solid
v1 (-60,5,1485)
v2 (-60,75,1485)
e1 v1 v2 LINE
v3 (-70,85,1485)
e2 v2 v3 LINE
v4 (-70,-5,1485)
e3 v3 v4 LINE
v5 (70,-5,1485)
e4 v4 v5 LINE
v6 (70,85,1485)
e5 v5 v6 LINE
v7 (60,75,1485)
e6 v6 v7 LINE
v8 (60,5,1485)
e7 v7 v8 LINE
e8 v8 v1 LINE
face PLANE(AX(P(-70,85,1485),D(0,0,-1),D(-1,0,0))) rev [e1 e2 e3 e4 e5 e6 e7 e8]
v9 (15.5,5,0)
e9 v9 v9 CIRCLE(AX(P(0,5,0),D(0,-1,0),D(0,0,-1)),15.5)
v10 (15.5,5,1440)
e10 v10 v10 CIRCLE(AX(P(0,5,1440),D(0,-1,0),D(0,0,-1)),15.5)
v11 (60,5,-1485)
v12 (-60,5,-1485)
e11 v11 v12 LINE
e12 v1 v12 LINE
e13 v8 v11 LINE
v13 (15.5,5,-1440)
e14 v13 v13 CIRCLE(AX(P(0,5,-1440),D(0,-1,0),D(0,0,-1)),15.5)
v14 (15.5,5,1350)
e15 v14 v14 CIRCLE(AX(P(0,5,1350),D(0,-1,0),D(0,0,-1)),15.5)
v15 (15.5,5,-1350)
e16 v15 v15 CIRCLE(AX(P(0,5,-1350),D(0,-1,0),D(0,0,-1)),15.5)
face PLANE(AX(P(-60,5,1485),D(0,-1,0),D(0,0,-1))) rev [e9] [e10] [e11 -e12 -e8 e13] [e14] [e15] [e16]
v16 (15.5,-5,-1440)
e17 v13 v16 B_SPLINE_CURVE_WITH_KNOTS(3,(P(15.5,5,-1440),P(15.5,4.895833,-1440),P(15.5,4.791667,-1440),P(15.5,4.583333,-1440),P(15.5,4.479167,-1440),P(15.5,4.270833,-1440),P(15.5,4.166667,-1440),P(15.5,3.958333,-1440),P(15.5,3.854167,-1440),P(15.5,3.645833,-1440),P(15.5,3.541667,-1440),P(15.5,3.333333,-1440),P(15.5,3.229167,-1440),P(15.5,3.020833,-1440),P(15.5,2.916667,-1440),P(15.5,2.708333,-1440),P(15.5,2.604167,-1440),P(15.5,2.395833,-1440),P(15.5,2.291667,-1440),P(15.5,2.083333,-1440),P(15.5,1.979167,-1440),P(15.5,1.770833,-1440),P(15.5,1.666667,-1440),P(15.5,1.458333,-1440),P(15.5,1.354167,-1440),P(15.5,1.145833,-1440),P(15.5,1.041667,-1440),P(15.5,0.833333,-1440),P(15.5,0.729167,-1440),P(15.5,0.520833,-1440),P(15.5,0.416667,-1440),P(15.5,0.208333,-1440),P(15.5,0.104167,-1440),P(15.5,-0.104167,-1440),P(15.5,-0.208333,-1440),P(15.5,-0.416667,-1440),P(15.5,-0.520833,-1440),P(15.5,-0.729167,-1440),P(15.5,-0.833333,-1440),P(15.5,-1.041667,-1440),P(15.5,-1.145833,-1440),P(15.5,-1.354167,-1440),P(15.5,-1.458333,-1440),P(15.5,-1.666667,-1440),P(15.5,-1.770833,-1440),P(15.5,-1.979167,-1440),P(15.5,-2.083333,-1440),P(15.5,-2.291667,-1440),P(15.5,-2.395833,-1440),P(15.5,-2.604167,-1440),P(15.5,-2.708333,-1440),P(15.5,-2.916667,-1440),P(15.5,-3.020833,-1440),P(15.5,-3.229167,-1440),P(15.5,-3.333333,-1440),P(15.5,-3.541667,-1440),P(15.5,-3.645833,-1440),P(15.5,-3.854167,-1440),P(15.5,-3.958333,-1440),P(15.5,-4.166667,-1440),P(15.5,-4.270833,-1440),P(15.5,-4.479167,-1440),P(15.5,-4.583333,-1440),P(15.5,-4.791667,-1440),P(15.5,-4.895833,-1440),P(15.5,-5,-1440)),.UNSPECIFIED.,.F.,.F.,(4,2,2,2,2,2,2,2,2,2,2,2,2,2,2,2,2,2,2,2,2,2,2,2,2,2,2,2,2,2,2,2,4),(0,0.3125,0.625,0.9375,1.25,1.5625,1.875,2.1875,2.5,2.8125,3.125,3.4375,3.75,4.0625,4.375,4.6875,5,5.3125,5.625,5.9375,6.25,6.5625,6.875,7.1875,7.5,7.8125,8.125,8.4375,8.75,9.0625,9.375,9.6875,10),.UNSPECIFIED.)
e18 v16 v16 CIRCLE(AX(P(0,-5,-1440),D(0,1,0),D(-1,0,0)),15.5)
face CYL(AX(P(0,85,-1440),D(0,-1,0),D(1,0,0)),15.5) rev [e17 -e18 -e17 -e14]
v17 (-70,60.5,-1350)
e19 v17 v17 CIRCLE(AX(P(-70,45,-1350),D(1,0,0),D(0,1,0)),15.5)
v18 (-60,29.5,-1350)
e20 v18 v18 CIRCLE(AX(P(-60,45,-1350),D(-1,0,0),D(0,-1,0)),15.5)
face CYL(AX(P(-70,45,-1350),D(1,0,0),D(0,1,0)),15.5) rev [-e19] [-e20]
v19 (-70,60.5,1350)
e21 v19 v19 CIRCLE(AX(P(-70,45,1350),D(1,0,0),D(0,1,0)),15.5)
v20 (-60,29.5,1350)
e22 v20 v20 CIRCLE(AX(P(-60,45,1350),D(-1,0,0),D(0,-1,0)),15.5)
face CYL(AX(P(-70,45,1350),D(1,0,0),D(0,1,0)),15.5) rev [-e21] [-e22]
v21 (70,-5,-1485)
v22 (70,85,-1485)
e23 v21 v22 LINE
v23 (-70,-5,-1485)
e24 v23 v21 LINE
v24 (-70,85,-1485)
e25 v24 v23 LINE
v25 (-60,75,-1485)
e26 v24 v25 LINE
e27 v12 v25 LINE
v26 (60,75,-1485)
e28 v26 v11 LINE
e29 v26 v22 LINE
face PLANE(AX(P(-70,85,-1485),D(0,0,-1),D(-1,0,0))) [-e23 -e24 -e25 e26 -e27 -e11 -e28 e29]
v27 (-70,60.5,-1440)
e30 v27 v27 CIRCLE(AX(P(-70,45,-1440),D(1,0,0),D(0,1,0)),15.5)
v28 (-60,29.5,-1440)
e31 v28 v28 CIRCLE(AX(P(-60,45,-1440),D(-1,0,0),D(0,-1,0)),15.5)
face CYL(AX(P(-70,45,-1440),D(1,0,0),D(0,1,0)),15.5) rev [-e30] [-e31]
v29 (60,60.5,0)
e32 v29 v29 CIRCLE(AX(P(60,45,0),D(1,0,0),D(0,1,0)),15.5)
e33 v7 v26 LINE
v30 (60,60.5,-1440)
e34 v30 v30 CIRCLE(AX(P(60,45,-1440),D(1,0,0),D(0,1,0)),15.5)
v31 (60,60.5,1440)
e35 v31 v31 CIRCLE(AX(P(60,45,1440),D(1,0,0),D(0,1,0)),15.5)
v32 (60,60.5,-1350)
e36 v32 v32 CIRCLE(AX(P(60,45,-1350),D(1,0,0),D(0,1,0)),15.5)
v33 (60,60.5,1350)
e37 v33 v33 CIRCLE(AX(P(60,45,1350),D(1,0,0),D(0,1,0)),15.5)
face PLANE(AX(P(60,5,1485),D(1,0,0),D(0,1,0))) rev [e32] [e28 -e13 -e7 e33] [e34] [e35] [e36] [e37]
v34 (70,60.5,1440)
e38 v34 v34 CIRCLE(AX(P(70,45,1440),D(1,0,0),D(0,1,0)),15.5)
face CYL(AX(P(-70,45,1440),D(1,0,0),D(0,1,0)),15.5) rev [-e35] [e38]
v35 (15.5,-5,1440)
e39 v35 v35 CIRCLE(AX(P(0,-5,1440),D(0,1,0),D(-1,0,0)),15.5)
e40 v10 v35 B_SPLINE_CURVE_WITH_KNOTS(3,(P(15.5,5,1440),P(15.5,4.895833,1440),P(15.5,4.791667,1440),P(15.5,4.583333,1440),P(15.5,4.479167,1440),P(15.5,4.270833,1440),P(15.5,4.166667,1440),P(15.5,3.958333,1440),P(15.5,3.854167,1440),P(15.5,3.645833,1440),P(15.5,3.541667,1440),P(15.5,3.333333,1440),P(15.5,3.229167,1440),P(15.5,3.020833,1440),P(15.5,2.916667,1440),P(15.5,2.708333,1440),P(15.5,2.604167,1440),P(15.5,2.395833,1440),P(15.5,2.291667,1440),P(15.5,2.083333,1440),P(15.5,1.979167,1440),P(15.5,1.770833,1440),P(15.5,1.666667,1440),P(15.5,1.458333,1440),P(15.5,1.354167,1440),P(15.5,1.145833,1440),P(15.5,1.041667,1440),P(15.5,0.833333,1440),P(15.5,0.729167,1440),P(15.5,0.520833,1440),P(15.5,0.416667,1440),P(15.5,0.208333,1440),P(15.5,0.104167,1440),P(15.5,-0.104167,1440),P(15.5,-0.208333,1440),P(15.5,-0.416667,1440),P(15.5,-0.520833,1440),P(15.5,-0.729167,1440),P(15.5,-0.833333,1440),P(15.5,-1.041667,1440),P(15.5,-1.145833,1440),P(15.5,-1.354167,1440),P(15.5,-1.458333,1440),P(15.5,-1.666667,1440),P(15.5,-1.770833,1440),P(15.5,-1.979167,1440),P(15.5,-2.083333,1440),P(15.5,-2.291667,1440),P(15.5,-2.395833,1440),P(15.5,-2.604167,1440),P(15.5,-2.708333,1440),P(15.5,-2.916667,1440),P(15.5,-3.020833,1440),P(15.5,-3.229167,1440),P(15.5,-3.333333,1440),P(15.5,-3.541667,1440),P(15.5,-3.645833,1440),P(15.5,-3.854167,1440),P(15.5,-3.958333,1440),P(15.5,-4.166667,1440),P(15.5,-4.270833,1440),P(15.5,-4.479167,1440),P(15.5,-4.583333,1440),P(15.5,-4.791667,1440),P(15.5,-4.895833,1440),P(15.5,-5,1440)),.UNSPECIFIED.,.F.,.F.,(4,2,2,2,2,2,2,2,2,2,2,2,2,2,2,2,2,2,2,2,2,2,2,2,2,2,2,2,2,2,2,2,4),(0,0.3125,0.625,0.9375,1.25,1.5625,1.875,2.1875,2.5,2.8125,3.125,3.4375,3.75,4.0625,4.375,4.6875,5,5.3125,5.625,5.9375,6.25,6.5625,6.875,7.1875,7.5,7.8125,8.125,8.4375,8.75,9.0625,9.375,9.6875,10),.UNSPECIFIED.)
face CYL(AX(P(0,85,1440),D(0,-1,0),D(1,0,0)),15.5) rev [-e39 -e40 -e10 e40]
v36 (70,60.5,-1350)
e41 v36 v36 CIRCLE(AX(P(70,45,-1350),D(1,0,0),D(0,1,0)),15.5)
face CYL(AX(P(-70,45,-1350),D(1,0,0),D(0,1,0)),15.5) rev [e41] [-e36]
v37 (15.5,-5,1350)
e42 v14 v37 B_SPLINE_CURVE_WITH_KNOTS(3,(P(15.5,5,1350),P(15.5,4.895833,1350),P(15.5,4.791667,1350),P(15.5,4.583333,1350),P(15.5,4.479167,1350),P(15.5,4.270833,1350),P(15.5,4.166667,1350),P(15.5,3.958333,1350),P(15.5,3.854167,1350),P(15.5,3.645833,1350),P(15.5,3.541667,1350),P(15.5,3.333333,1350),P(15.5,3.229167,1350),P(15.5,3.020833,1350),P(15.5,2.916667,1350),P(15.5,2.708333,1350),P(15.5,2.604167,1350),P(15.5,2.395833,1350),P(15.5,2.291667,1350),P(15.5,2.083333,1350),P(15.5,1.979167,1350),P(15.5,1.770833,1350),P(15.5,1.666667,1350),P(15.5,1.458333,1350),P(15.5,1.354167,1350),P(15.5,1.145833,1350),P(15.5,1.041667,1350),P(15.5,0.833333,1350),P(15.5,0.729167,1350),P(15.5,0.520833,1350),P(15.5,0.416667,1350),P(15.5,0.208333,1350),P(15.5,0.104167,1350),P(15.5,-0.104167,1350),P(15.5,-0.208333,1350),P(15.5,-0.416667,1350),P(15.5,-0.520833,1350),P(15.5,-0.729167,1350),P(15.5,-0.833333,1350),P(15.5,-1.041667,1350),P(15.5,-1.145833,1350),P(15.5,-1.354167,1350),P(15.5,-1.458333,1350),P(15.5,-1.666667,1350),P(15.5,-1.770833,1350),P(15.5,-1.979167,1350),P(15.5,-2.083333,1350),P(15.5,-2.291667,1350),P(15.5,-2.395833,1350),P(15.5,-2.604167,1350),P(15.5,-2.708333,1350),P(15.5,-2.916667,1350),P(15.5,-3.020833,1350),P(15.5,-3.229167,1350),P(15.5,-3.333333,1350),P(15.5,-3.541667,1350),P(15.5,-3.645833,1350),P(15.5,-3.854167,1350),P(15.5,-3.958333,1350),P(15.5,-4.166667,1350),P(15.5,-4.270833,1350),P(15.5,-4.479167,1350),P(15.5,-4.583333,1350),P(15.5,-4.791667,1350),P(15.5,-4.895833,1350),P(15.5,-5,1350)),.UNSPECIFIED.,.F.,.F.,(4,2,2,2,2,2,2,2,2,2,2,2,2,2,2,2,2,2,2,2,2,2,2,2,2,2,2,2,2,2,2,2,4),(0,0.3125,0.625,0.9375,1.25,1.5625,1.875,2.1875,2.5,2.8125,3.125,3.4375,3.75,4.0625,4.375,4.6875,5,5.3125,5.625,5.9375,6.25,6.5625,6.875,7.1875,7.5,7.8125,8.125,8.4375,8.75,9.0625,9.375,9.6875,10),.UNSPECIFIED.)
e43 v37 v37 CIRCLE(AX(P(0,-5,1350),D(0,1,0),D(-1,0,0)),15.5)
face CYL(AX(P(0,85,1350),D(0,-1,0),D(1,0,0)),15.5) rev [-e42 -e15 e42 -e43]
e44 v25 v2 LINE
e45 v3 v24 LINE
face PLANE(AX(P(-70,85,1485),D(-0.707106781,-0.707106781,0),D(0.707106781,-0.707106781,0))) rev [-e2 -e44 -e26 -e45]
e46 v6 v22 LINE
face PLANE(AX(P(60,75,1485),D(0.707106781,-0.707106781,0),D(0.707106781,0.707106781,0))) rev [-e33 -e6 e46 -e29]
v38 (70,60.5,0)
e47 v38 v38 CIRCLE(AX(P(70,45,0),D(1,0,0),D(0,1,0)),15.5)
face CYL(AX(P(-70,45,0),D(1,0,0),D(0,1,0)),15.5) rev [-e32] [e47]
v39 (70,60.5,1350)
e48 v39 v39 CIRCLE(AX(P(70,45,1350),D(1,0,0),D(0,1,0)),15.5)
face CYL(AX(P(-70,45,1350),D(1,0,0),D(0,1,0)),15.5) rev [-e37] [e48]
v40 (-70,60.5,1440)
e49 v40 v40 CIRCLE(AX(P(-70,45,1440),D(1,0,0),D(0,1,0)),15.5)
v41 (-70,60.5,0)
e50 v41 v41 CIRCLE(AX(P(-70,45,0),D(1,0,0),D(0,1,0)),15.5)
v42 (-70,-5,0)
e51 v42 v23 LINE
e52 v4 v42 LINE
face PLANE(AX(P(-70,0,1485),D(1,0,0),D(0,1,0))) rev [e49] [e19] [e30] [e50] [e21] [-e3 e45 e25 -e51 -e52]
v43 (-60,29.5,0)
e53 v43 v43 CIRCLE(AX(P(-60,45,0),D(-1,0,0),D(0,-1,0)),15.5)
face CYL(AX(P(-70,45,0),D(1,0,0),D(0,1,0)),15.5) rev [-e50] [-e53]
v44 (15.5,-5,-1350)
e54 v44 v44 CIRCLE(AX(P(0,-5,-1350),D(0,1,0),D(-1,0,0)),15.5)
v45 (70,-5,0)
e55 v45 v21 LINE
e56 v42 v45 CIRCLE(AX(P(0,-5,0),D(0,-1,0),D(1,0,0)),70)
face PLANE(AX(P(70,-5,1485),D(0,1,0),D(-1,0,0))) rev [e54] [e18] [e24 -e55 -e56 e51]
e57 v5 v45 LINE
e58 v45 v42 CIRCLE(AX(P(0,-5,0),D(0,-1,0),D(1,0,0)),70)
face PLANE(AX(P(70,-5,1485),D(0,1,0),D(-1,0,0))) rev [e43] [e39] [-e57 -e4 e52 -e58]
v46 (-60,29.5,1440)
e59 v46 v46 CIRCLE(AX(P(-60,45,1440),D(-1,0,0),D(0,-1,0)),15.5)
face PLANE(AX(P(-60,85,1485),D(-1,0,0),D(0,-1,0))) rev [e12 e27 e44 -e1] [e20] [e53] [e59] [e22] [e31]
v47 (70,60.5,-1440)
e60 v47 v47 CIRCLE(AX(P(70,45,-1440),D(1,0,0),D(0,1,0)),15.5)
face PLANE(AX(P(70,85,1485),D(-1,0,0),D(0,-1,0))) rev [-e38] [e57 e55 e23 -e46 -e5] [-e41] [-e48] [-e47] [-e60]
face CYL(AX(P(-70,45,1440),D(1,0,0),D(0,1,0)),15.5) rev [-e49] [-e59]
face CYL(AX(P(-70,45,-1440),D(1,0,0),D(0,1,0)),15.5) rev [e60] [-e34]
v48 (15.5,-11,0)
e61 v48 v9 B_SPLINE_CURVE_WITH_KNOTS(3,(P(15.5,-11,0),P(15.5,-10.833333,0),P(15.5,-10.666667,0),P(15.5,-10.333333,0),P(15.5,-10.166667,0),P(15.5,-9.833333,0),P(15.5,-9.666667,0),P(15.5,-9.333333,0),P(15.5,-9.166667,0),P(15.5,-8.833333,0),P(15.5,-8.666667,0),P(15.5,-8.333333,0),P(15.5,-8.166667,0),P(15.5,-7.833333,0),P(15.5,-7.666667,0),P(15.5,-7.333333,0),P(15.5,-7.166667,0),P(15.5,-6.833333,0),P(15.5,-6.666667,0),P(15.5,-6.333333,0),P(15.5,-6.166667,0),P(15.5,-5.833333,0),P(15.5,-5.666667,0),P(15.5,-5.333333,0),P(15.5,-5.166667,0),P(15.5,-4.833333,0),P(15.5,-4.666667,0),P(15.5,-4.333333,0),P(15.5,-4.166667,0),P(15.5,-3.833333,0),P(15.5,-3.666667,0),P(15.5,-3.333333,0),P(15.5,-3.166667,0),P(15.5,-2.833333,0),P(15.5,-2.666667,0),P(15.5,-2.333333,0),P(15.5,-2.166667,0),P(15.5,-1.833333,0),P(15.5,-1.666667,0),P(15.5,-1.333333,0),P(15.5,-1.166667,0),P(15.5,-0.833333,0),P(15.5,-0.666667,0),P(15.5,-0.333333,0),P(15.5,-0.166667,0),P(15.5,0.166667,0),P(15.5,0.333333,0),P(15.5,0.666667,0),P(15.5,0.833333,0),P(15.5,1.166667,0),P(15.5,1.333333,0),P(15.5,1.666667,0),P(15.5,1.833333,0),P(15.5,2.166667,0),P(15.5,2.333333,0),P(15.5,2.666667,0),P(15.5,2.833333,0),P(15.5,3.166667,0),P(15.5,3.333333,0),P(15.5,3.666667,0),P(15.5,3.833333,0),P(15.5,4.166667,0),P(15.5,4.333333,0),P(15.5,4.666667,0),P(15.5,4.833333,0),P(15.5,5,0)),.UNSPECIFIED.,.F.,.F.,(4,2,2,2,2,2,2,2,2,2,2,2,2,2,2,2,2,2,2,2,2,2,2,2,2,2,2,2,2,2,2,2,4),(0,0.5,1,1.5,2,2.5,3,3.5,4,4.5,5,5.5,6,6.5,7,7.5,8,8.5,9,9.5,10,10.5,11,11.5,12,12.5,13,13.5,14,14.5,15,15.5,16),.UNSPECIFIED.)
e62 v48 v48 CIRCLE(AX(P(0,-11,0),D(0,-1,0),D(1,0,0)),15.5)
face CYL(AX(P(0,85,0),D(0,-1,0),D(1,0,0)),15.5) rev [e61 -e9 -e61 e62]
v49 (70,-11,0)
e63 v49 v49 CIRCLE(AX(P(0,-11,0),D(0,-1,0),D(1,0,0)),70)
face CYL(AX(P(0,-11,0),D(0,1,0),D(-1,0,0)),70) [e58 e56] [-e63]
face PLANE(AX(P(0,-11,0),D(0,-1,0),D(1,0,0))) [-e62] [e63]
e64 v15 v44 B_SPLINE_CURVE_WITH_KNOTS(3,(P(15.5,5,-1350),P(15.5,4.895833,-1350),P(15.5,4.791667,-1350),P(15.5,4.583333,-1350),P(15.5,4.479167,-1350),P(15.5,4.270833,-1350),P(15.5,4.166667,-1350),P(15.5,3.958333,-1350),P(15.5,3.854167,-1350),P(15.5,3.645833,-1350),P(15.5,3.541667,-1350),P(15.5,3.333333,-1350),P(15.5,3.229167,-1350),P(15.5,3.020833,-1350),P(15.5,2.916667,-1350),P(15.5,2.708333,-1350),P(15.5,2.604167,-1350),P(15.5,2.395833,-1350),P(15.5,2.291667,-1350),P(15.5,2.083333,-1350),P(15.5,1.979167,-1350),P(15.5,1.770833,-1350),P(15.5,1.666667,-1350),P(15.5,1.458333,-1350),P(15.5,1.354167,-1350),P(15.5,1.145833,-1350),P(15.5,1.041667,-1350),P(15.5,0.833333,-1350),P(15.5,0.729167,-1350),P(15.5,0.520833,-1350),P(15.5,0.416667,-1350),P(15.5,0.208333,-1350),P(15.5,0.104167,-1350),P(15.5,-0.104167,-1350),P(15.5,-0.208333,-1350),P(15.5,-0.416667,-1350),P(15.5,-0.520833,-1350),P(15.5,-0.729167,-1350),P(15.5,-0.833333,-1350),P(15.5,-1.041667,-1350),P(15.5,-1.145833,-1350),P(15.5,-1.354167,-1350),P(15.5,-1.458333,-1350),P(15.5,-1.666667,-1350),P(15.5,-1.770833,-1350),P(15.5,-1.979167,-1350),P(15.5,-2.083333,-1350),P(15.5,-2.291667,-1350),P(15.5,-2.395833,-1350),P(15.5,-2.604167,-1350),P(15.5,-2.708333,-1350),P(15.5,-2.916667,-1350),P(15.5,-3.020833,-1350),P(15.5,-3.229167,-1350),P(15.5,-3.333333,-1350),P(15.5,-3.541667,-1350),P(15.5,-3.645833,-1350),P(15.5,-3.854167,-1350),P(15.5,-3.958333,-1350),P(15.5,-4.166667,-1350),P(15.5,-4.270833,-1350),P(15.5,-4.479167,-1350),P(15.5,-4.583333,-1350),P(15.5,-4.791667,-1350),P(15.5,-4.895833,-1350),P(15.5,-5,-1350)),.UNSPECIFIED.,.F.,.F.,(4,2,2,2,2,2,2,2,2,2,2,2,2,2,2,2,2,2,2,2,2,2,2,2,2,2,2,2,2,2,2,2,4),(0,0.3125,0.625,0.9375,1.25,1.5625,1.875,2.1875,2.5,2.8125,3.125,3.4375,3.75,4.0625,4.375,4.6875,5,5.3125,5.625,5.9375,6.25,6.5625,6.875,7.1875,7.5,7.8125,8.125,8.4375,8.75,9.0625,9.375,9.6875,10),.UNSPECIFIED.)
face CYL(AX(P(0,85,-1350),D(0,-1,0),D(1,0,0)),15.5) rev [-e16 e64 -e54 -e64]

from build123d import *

# Parameters (mm, degrees)
EXTRUDE_1_DEPTH          = 1485
CHAMFER_1_SIZE           = 10
SKETCH_2_R               = 15.5
CUT_EXTRUDE_2_DEPTH      = 1495.004685401
SKETCH_4_R               = 70
EXTRUDE_4_DEPTH          = 6
CUT_EXTRUDE_3_DEPTH      = 1490.370672465
CUT_EXTRUDE_3_DEPTH_BACK = 1490.370672465
SKETCH_3_R               = 15.5


with BuildPart() as part:
    # 草图1 → 拉伸1 (new, symmetric)
    with BuildSketch(Plane.XY):
        Polygon((-70, 0), (-70, 85), (-60, 85), (-60, 5), (60, 5), (60, 85), (70, 85), (70, -5), (-70, -5), align=None)
    extrude(amount=EXTRUDE_1_DEPTH, both=True)

    # 倒角1
    chamfer_1_edges = [part.edges().sort_by_distance(p)[0] for p in [
        (60, 85, 0),
        (-60, 85, 0),
    ]]
    chamfer(chamfer_1_edges, length=CHAMFER_1_SIZE - 0.0001)  # a hair under: the kernel refuses the full size

    # 草图2 → 拉伸2 (cut, through all)
    with BuildSketch(Plane(origin=(70, 0, 0), x_dir=(0, 0, -1), z_dir=(1, 0, 0))):
        with Locations(Location((-1440, 45, 0), (0, 0, 90))):
            Circle(SKETCH_2_R)
        with Locations(Location((-1350, 45, 0), (0, 0, 90))):
            Circle(SKETCH_2_R)
        with Locations(Location((0, 45, 0), (0, 0, 90))):
            Circle(SKETCH_2_R)
        with Locations(Location((1350, 45, 0), (0, 0, 90))):
            Circle(SKETCH_2_R)
        with Locations(Location((1440, 45, 0), (0, 0, 90))):
            Circle(SKETCH_2_R)
    extrude(amount=-CUT_EXTRUDE_2_DEPTH, mode=Mode.SUBTRACT)

    # 草图4 → 拉伸4 (add)
    with BuildSketch(Plane.XZ.offset(5)):
        Circle(SKETCH_4_R)
    extrude(amount=EXTRUDE_4_DEPTH)

    # 草图3 → 拉伸3 (cut, two sides: drawn at the far end of the back side and taken through both)
    with BuildSketch(Plane.XZ.offset(5).offset(-CUT_EXTRUDE_3_DEPTH_BACK)):
        with Locations((0, -1440)):
            Circle(SKETCH_3_R)
        Circle(SKETCH_3_R)
        with Locations((0, -1350)):
            Circle(SKETCH_3_R)
        with Locations((0, 1350)):
            Circle(SKETCH_3_R)
        with Locations((0, 1440)):
            Circle(SKETCH_3_R)
    extrude(amount=CUT_EXTRUDE_3_DEPTH + CUT_EXTRUDE_3_DEPTH_BACK, mode=Mode.SUBTRACT)


solid = part.part
